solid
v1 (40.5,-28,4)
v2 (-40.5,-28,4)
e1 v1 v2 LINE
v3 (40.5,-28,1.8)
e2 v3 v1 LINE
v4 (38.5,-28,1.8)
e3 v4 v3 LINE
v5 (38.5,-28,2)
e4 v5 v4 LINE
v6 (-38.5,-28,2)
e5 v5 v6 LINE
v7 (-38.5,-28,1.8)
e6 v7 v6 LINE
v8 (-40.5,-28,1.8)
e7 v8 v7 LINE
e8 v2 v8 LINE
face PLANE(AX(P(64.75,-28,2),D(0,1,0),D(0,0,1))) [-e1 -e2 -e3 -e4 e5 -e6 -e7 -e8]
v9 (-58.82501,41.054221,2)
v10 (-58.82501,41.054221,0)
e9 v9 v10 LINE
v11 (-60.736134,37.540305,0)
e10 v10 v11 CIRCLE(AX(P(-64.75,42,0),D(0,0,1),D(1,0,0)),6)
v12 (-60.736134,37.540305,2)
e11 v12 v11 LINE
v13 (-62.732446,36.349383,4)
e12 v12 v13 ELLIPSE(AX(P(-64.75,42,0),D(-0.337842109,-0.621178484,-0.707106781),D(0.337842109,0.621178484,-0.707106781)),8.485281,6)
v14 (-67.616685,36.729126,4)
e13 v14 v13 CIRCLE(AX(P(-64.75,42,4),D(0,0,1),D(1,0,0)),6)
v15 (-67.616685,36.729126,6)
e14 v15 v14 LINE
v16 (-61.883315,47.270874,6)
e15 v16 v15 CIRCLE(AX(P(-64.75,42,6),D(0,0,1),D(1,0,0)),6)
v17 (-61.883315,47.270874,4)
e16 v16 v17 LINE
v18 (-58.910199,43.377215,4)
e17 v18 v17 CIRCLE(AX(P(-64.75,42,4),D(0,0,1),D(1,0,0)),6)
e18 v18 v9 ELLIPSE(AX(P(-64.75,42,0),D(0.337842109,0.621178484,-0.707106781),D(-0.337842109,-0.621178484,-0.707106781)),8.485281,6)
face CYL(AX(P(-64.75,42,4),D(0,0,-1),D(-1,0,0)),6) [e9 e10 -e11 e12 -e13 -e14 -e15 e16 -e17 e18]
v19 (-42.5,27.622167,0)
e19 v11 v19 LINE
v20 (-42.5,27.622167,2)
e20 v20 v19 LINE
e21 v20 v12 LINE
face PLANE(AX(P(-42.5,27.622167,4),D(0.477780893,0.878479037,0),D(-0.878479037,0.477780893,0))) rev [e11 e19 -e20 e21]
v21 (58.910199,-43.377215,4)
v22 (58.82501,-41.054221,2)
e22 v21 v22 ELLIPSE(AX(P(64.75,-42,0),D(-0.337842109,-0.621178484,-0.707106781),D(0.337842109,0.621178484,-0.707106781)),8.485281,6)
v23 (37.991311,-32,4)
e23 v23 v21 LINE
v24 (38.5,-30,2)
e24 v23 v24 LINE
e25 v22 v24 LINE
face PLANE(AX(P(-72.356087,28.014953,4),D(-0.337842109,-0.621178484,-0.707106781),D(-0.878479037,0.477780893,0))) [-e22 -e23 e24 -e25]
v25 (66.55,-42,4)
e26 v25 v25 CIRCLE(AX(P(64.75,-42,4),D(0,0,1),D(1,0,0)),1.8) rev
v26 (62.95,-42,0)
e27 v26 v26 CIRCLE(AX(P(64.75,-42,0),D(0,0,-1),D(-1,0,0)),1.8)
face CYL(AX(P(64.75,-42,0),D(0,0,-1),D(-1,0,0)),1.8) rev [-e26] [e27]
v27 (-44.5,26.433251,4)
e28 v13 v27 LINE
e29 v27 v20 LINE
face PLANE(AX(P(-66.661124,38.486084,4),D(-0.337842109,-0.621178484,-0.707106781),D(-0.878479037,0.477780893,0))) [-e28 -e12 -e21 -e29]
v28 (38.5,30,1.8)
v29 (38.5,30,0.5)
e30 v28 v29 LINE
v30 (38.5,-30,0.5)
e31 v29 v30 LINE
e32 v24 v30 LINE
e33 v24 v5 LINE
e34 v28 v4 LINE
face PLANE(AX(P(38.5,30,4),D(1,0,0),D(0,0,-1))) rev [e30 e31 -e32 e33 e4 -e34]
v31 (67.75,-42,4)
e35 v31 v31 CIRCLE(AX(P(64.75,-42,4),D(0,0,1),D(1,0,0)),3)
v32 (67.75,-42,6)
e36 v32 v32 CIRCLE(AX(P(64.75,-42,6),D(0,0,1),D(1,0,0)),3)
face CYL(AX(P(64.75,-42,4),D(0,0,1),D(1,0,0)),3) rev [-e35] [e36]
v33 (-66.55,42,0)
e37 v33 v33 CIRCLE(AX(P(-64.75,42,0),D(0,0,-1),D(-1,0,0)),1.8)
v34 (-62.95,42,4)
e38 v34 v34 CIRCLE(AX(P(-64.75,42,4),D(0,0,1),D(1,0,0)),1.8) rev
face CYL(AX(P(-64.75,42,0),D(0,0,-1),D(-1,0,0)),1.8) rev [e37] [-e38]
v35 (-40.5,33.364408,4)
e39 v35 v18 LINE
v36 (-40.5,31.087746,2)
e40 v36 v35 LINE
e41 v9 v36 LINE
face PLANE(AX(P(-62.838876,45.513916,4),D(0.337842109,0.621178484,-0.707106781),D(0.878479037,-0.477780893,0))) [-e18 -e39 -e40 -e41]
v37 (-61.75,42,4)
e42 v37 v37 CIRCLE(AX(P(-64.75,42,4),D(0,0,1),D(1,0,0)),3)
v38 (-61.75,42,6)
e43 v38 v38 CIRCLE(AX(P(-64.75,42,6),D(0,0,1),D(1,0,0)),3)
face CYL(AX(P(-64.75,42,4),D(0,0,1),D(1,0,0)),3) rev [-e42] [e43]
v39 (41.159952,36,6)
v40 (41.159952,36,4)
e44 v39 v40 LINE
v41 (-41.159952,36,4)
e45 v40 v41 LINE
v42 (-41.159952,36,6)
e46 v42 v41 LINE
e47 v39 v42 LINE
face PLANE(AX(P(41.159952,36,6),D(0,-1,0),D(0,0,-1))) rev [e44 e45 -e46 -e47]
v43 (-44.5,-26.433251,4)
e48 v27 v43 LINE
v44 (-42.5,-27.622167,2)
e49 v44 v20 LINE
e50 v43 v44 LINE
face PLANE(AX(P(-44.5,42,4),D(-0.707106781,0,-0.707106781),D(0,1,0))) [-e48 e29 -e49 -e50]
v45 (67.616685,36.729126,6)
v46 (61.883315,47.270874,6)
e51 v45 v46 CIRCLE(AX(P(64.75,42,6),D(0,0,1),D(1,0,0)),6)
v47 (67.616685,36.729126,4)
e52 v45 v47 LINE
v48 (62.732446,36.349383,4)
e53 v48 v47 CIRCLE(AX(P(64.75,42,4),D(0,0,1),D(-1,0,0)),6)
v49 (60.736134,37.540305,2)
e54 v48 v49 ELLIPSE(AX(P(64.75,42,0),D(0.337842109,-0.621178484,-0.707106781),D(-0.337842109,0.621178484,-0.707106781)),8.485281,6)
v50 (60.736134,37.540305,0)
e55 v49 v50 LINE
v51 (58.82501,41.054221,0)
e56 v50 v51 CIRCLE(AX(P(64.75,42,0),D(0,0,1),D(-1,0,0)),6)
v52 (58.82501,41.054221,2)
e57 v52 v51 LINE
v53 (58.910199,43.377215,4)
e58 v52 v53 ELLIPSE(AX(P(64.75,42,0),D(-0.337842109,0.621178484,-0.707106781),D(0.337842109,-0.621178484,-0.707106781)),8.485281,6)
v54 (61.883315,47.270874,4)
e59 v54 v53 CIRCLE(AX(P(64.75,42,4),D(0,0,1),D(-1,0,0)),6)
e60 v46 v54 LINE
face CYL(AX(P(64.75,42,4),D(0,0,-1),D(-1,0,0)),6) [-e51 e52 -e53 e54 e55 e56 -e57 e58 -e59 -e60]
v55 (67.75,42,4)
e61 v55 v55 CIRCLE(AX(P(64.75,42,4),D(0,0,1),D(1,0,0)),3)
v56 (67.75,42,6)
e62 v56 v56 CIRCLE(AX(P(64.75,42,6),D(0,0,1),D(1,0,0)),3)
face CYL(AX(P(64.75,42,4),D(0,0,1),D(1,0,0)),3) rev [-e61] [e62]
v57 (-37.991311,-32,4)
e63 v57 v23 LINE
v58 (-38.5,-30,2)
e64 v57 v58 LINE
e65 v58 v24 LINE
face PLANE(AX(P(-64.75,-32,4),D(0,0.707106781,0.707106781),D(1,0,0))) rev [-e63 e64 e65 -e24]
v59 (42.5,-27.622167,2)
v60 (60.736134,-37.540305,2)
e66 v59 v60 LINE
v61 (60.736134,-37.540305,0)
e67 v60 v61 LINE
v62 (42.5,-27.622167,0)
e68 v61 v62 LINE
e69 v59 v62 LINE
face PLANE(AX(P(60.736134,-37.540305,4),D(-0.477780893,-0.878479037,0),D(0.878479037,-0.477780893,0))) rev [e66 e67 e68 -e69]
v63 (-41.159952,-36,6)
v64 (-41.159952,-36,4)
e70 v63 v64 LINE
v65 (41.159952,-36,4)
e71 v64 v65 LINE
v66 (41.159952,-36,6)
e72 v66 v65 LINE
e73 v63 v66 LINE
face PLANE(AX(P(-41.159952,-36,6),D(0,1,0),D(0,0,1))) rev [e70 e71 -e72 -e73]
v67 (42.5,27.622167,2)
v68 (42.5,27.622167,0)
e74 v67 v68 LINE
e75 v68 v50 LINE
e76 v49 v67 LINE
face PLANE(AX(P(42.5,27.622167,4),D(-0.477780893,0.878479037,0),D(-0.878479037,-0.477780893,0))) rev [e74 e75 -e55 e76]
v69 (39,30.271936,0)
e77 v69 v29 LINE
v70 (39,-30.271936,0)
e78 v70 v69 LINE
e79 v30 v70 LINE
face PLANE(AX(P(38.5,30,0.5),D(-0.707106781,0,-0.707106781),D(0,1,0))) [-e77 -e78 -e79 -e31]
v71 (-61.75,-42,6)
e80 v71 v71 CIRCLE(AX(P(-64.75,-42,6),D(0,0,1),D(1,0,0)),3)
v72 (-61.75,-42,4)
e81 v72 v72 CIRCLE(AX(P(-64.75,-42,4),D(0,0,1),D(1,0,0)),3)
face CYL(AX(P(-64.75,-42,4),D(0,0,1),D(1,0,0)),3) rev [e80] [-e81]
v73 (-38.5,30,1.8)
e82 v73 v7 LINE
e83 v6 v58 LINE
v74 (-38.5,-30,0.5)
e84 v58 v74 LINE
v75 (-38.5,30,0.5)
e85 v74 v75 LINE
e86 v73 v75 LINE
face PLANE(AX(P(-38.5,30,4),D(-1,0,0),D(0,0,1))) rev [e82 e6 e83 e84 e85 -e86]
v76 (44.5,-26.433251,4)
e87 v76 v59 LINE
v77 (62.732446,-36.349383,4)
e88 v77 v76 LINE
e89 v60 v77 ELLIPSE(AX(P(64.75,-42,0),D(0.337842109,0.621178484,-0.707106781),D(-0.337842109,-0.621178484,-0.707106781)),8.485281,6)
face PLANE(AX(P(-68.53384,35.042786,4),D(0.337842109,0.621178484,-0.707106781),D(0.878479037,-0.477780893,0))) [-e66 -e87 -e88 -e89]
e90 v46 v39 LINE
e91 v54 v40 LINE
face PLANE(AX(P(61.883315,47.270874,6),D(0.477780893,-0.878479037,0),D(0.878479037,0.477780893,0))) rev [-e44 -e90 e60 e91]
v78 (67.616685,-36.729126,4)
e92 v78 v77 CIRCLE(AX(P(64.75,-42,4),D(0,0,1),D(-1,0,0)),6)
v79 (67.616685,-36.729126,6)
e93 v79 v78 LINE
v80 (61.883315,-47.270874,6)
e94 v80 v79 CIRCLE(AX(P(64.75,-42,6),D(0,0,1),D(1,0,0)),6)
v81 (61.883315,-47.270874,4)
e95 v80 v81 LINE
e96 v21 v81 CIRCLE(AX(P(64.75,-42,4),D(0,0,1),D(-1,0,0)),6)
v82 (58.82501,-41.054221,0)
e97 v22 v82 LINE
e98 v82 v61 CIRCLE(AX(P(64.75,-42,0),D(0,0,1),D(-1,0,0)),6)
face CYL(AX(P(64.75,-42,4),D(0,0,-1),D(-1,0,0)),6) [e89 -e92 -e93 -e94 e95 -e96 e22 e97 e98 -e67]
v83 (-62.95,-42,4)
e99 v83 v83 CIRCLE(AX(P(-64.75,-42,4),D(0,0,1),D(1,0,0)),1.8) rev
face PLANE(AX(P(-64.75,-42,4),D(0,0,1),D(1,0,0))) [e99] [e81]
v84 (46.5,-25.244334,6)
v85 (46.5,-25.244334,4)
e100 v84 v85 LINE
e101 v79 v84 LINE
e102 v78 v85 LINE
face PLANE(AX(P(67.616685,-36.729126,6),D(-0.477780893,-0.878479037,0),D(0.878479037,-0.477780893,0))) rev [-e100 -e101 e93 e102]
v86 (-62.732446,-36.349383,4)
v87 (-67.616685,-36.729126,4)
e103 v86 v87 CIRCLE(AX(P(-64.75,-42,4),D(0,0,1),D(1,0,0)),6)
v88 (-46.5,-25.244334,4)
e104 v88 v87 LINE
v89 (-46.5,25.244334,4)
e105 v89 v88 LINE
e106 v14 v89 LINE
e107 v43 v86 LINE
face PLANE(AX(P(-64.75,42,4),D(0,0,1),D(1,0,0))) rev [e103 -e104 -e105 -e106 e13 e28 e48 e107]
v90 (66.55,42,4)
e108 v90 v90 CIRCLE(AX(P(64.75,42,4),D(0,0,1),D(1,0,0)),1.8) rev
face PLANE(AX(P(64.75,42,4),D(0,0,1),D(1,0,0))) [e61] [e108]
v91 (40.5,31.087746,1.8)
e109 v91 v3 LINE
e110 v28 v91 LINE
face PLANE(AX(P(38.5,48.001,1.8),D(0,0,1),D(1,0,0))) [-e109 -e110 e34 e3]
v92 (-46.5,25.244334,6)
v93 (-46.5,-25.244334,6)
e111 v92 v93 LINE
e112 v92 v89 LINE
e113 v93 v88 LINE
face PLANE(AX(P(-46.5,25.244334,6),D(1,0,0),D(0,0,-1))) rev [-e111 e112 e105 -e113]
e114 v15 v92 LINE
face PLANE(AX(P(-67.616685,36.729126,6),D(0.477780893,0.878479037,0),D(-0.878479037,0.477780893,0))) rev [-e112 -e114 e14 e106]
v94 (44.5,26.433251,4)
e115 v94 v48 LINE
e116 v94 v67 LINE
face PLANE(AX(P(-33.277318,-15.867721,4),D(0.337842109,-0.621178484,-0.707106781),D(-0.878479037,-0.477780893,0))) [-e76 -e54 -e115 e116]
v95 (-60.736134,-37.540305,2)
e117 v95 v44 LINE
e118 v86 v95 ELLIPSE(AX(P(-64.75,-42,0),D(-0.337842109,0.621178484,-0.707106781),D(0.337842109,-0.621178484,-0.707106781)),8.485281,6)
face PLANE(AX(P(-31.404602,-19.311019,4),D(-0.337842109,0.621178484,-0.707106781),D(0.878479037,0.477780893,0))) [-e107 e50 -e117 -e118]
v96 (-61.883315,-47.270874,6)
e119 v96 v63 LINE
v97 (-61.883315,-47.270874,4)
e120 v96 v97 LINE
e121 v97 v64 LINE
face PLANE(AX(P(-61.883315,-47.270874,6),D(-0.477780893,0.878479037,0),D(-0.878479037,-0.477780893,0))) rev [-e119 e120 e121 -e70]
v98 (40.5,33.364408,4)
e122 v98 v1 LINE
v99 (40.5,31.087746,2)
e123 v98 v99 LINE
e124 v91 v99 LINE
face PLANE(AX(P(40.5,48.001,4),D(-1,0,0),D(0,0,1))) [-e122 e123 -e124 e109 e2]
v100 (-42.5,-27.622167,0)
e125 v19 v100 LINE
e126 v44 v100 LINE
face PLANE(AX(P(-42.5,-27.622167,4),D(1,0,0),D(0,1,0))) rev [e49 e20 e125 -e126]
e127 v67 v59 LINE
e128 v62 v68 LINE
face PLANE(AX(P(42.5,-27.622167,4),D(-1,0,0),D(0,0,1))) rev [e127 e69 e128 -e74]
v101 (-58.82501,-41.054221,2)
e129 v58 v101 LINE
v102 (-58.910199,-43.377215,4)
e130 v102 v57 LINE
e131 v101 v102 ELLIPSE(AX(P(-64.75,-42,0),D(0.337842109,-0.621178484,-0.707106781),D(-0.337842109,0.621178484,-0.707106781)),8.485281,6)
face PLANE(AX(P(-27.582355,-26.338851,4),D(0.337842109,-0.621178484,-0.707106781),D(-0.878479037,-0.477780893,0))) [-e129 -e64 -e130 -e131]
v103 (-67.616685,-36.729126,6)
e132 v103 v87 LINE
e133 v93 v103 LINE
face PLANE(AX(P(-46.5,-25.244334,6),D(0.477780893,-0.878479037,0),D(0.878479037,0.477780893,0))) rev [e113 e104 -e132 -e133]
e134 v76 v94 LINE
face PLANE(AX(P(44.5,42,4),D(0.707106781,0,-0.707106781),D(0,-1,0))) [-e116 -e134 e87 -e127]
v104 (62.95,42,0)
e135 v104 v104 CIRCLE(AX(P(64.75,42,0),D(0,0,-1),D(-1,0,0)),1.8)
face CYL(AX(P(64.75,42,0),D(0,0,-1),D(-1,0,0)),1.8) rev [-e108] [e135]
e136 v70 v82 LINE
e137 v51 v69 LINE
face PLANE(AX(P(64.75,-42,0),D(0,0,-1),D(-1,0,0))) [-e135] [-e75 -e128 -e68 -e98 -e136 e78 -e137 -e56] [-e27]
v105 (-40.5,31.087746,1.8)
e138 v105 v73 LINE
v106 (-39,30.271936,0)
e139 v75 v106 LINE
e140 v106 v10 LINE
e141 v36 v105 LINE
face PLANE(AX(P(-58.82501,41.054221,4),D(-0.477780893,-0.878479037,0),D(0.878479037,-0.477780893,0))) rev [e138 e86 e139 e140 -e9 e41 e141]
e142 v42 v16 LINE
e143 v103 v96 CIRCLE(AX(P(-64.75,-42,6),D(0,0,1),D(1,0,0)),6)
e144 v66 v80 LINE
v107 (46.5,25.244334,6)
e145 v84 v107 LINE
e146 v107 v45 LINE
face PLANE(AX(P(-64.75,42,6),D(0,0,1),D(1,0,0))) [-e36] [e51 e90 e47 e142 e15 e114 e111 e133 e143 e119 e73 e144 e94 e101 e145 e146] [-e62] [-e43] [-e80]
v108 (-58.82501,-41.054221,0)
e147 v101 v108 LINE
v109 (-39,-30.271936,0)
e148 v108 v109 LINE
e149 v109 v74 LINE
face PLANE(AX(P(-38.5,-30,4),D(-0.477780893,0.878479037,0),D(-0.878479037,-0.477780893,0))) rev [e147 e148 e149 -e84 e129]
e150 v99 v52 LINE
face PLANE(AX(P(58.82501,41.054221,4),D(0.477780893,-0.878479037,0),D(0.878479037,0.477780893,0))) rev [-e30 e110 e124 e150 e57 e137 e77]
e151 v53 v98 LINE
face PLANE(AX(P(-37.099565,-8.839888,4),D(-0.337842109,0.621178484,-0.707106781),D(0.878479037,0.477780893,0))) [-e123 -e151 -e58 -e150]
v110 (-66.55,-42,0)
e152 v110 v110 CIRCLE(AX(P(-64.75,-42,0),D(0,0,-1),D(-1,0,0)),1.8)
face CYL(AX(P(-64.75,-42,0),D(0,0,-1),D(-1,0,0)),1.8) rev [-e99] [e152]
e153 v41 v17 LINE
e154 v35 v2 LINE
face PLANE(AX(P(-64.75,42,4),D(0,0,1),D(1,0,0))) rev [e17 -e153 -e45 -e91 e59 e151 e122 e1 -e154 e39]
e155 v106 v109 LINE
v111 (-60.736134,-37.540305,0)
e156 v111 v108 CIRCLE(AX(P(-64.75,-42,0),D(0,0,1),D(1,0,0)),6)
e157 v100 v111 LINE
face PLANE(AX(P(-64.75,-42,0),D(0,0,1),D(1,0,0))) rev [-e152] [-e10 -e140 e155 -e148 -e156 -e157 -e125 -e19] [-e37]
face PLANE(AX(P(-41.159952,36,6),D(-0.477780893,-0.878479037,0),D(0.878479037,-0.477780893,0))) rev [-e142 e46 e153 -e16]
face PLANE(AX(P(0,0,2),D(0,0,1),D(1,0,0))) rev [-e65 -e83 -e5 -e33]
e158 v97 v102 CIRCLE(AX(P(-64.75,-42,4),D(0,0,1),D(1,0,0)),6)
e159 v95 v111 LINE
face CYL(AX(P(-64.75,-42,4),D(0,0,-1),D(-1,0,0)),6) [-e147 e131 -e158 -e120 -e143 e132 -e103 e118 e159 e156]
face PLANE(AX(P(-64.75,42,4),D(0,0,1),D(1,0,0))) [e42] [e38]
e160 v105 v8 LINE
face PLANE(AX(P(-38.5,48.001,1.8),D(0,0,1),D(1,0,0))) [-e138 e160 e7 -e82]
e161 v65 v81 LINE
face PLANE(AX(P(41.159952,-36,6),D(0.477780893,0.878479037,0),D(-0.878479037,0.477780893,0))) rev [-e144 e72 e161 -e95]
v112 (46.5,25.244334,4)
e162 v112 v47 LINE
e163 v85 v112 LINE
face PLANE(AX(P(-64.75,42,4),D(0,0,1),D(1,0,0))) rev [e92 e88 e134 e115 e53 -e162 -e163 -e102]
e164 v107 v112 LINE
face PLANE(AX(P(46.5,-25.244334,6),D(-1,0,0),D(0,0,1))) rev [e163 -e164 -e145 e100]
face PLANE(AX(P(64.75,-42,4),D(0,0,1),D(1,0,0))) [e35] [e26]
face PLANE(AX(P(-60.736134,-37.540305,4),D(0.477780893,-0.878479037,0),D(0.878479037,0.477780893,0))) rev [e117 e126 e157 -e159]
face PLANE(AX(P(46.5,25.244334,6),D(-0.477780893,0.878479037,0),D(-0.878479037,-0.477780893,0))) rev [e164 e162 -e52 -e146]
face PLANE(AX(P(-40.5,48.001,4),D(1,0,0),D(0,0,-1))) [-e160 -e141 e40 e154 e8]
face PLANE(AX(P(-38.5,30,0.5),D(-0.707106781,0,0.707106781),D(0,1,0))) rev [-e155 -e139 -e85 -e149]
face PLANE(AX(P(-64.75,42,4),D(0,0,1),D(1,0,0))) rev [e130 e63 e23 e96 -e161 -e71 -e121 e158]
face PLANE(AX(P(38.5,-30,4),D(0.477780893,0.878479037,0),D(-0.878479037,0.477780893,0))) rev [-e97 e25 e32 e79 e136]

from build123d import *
from build123d.topology import SkipClean

# Parameters (mm, degrees)
BOSS_EXTRUDE4_DEPTH            = 4
BOSS_EXTRUDE4_2_DEPTH          = 4
BOSS_EXTRUDE7_START            = 4
SKETCH13_W                     = 77
SKETCH13_H                     = 2
BOSS_EXTRUDE7_DEPTH            = 2
CUT_EXTRUDE3_REACH             = 87.589
SKETCH11_W                     = 2
SKETCH11_H                     = 2.2
CUT_EXTRUDE3_DIRECTION_2_REACH = 87.589
BOSS_EXTRUDE6_DEPTH            = 2
M3_CLEARANCE_HOLE1_D           = 3.6
SKETCH16_R                     = 3
CUT_EXTRUDE4_DEPTH             = 2
CHAMFER2_SIZE                  = 2
CHAMFER3_SIZE                  = 0.5


with BuildPart() as part:
    # Sketch9 → Boss-Extrude4 (new body)
    with BuildSketch(Plane.XY):
        with BuildLine():
            Line((-60.736133913, -37.540305051), (-42.5, -27.622167018))
            Line((-42.5, -27.622167018), (-42.5, 27.622167018))
            Line((-42.5, 27.622167018), (-60.736133913, 37.540305051))
            ThreePointArc((-60.736133913, 37.540305051), (-70.020874221, 44.866685358), (-58.825010341, 41.054221199))
            Line((-58.825010341, 41.054221199), (-38.5, 30))
            Line((-38.5, 30), (-38.5, -30))
            Line((-38.5, -30), (-58.825010341, -41.054221199))
            ThreePointArc((-58.825010341, -41.054221199), (-70.020874221, -44.866685358), (-60.736133913, -37.540305051))
        make_face()
    extrude(amount=BOSS_EXTRUDE4_DEPTH)



with BuildPart() as body_2:
    # Sketch9 → Boss-Extrude4 2 (new body)
    with BuildSketch(Plane.XY):
        with BuildLine():
            Line((38.5, -30), (58.825010341, -41.054221199))
            ThreePointArc((58.825010341, -41.054221199), (70.020874221, -44.866685358), (60.736133913, -37.540305051))
            Line((60.736133913, -37.540305051), (42.5, -27.622167018))
            Line((42.5, -27.622167018), (42.5, 27.622167018))
            Line((42.5, 27.622167018), (60.736133913, 37.540305051))
            ThreePointArc((60.736133913, 37.540305051), (70.020874221, 44.866685358), (58.825010341, 41.054221199))
            Line((58.825010341, 41.054221199), (38.5, 30))
            Line((38.5, 30), (38.5, -30))
        make_face()
    extrude(amount=BOSS_EXTRUDE4_2_DEPTH)


with BuildPart() as part_1:
    add(part.part)

    add(body_2.part)  # Boss-Extrude7 merges body 2
    # Sketch13 → Boss-Extrude7 (add)
    with BuildSketch(Plane.XY.offset(BOSS_EXTRUDE7_START)):
        with Locations((0, -29)):
            Rectangle(SKETCH13_W, SKETCH13_H)
    extrude(amount=-BOSS_EXTRUDE7_DEPTH)

    # Cut-Extrude3: up to this face of the body (flat: up to its plane)
    cut_extrude3_end = Plane(part_1.part.faces().sort_by_distance((0, -28, 3))[0])
    # Sketch11 → Cut-Extrude3 (cut, up to the picked face)
    with BuildSketch(Plane(origin=(0, 0, 0), x_dir=(1, 0, 0), z_dir=(0, 1, 0)), mode=Mode.PRIVATE) as cut_extrude3_sk1:
        with Locations((-39.5, -2.9)):
            Rectangle(SKETCH11_W, SKETCH11_H)
    cut_extrude3_tool1 = split(extrude(cut_extrude3_sk1.sketch, amount=-CUT_EXTRUDE3_REACH, mode=Mode.PRIVATE), bisect_by=cut_extrude3_end, keep=Keep.BOTH, mode=Mode.PRIVATE)
    # Sketch11 → Cut-Extrude3 (cut, up to the picked face)
    with BuildSketch(Plane(origin=(0, 0, 0), x_dir=(1, 0, 0), z_dir=(0, 1, 0)), mode=Mode.PRIVATE) as cut_extrude3_sk2:
        with Locations((39.5, -2.9)):
            Rectangle(SKETCH11_W, SKETCH11_H)
    cut_extrude3_tool2 = split(extrude(cut_extrude3_sk2.sketch, amount=-CUT_EXTRUDE3_REACH, mode=Mode.PRIVATE), bisect_by=cut_extrude3_end, keep=Keep.BOTH, mode=Mode.PRIVATE)
    add(cut_extrude3_tool1.solids().sort_by(Axis((-39.5, 0, 2.9), (0, -1, 0)))[0], mode=Mode.SUBTRACT)
    add(cut_extrude3_tool2.solids().sort_by(Axis((39.5, 0, 2.9), (0, -1, 0)))[0], mode=Mode.SUBTRACT)

    # Sketch11 → Cut-Extrude3 direction 2 (cut, up to next)
    with BuildSketch(Plane(origin=(0, 0, 0), x_dir=(1, 0, 0), z_dir=(0, 1, 0)), mode=Mode.PRIVATE) as cut_extrude3_direction_2_sk1:
        with Locations((-39.5, -2.9)):
            Rectangle(SKETCH11_W, SKETCH11_H)
    cut_extrude3_direction_2_tool1 = extrude(cut_extrude3_direction_2_sk1.sketch, amount=CUT_EXTRUDE3_DIRECTION_2_REACH, mode=Mode.PRIVATE) & part_1.part
    # Sketch11 → Cut-Extrude3 direction 2 (cut, up to next)
    with BuildSketch(Plane(origin=(0, 0, 0), x_dir=(1, 0, 0), z_dir=(0, 1, 0)), mode=Mode.PRIVATE) as cut_extrude3_direction_2_sk2:
        with Locations((39.5, -2.9)):
            Rectangle(SKETCH11_W, SKETCH11_H)
    cut_extrude3_direction_2_tool2 = extrude(cut_extrude3_direction_2_sk2.sketch, amount=CUT_EXTRUDE3_DIRECTION_2_REACH, mode=Mode.PRIVATE) & part_1.part
    add(cut_extrude3_direction_2_tool1.solids().sort_by_distance((-39.5, 0, 2.9))[0], mode=Mode.SUBTRACT)
    add(cut_extrude3_direction_2_tool2.solids().sort_by_distance((39.5, 0, 2.9))[0], mode=Mode.SUBTRACT)

    # Sketch12 → Boss-Extrude6 (add)
    with SkipClean():  # the faces are left unmerged after this step: merging them gives an invalid solid
        with BuildSketch(Plane.XY.offset(4)):
            with BuildLine():
                Line((-67.616685358, 36.729125779), (-46.5, 25.244334036))
                Line((-46.5, 25.244334036), (-46.5, -25.244334036))
                Line((-46.5, -25.244334036), (-67.616685358, -36.729125779))
                ThreePointArc((-67.616685358, -36.729125779), (-70.020874221, -44.866685358), (-61.883314642, -47.270874221))
                Line((-61.883314642, -47.270874221), (-41.159951957, -36))
                Line((-41.159951957, -36), (41.159951957, -36))
                Line((41.159951957, -36), (61.883314642, -47.270874221))
                ThreePointArc((61.883314642, -47.270874221), (70.020874221, -44.866685358), (67.616685358, -36.729125779))
                Line((67.616685358, -36.729125779), (46.5, -25.244334036))
                Line((46.5, -25.244334036), (46.5, 25.244334036))
                Line((46.5, 25.244334036), (67.616685358, 36.729125779))
                ThreePointArc((67.616685358, 36.729125779), (70.020874221, 44.866685358), (61.883314642, 47.270874221))
                Line((61.883314642, 47.270874221), (41.159951957, 36))
                Line((41.159951957, 36), (-41.159951957, 36))
                Line((-41.159951957, 36), (-61.883314642, 47.270874221))
                ThreePointArc((-61.883314642, 47.270874221), (-70.020874221, 44.866685358), (-67.616685358, 36.729125779))
            make_face()
        extrude(amount=BOSS_EXTRUDE6_DEPTH)

    # M3 Clearance Hole1 (through all)
    with Locations(Plane(origin=(0, 0, 0), x_dir=(-1, 0, 0), z_dir=(0, 0, -1))):
        with Locations((64.75, 42), (64.75, -42), (-64.75, -42), (-64.75, 42)):
            Hole(M3_CLEARANCE_HOLE1_D / 2)

    # Sketch16 → Cut-Extrude4 (cut)
    with SkipClean():  # the faces are left unmerged after this step: merging them gives an invalid solid
        with BuildSketch(Plane.XY.offset(6)):
            with Locations((-64.75, 42)):
                Circle(SKETCH16_R)
            with Locations((-64.75, -42)):
                Circle(SKETCH16_R)
            with Locations((64.75, -42)):
                Circle(SKETCH16_R)
            with Locations((64.75, 42)):
                Circle(SKETCH16_R)
        extrude(amount=-CUT_EXTRUDE4_DEPTH, mode=Mode.SUBTRACT)

    # Chamfer2
    chamfer2_edges = [part_1.edges().sort_by_distance(p)[0] for p in [
        (-49.662505171, 36.070983444, 4),
        (49.662505171, 36.070983444, 4),
        (51.618066957, 32.581236035, 4),
        (42.5, 0, 4),
        (51.618066957, -32.581236035, 4),
        (48.662505171, -35.527110599, 4),
        (-48.662505171, -35.527110599, 4),
        (-51.618066957, -32.581236035, 4),
        (-51.618066957, 32.581236035, 4),
        (-42.5, 0, 4),
        (0, -30, 4),
    ]]
    chamfer(chamfer2_edges, length=CHAMFER2_SIZE - 0.0001)  # a hair under: the kernel refuses the full size

    # Chamfer3
    chamfer3_edges = [part_1.edges().sort_by_distance(p)[0] for p in [
        (-38.5, 0, 0),
        (38.5, 0, 0),
    ]]
    chamfer(chamfer3_edges, length=CHAMFER3_SIZE)


solid = part_1.part
